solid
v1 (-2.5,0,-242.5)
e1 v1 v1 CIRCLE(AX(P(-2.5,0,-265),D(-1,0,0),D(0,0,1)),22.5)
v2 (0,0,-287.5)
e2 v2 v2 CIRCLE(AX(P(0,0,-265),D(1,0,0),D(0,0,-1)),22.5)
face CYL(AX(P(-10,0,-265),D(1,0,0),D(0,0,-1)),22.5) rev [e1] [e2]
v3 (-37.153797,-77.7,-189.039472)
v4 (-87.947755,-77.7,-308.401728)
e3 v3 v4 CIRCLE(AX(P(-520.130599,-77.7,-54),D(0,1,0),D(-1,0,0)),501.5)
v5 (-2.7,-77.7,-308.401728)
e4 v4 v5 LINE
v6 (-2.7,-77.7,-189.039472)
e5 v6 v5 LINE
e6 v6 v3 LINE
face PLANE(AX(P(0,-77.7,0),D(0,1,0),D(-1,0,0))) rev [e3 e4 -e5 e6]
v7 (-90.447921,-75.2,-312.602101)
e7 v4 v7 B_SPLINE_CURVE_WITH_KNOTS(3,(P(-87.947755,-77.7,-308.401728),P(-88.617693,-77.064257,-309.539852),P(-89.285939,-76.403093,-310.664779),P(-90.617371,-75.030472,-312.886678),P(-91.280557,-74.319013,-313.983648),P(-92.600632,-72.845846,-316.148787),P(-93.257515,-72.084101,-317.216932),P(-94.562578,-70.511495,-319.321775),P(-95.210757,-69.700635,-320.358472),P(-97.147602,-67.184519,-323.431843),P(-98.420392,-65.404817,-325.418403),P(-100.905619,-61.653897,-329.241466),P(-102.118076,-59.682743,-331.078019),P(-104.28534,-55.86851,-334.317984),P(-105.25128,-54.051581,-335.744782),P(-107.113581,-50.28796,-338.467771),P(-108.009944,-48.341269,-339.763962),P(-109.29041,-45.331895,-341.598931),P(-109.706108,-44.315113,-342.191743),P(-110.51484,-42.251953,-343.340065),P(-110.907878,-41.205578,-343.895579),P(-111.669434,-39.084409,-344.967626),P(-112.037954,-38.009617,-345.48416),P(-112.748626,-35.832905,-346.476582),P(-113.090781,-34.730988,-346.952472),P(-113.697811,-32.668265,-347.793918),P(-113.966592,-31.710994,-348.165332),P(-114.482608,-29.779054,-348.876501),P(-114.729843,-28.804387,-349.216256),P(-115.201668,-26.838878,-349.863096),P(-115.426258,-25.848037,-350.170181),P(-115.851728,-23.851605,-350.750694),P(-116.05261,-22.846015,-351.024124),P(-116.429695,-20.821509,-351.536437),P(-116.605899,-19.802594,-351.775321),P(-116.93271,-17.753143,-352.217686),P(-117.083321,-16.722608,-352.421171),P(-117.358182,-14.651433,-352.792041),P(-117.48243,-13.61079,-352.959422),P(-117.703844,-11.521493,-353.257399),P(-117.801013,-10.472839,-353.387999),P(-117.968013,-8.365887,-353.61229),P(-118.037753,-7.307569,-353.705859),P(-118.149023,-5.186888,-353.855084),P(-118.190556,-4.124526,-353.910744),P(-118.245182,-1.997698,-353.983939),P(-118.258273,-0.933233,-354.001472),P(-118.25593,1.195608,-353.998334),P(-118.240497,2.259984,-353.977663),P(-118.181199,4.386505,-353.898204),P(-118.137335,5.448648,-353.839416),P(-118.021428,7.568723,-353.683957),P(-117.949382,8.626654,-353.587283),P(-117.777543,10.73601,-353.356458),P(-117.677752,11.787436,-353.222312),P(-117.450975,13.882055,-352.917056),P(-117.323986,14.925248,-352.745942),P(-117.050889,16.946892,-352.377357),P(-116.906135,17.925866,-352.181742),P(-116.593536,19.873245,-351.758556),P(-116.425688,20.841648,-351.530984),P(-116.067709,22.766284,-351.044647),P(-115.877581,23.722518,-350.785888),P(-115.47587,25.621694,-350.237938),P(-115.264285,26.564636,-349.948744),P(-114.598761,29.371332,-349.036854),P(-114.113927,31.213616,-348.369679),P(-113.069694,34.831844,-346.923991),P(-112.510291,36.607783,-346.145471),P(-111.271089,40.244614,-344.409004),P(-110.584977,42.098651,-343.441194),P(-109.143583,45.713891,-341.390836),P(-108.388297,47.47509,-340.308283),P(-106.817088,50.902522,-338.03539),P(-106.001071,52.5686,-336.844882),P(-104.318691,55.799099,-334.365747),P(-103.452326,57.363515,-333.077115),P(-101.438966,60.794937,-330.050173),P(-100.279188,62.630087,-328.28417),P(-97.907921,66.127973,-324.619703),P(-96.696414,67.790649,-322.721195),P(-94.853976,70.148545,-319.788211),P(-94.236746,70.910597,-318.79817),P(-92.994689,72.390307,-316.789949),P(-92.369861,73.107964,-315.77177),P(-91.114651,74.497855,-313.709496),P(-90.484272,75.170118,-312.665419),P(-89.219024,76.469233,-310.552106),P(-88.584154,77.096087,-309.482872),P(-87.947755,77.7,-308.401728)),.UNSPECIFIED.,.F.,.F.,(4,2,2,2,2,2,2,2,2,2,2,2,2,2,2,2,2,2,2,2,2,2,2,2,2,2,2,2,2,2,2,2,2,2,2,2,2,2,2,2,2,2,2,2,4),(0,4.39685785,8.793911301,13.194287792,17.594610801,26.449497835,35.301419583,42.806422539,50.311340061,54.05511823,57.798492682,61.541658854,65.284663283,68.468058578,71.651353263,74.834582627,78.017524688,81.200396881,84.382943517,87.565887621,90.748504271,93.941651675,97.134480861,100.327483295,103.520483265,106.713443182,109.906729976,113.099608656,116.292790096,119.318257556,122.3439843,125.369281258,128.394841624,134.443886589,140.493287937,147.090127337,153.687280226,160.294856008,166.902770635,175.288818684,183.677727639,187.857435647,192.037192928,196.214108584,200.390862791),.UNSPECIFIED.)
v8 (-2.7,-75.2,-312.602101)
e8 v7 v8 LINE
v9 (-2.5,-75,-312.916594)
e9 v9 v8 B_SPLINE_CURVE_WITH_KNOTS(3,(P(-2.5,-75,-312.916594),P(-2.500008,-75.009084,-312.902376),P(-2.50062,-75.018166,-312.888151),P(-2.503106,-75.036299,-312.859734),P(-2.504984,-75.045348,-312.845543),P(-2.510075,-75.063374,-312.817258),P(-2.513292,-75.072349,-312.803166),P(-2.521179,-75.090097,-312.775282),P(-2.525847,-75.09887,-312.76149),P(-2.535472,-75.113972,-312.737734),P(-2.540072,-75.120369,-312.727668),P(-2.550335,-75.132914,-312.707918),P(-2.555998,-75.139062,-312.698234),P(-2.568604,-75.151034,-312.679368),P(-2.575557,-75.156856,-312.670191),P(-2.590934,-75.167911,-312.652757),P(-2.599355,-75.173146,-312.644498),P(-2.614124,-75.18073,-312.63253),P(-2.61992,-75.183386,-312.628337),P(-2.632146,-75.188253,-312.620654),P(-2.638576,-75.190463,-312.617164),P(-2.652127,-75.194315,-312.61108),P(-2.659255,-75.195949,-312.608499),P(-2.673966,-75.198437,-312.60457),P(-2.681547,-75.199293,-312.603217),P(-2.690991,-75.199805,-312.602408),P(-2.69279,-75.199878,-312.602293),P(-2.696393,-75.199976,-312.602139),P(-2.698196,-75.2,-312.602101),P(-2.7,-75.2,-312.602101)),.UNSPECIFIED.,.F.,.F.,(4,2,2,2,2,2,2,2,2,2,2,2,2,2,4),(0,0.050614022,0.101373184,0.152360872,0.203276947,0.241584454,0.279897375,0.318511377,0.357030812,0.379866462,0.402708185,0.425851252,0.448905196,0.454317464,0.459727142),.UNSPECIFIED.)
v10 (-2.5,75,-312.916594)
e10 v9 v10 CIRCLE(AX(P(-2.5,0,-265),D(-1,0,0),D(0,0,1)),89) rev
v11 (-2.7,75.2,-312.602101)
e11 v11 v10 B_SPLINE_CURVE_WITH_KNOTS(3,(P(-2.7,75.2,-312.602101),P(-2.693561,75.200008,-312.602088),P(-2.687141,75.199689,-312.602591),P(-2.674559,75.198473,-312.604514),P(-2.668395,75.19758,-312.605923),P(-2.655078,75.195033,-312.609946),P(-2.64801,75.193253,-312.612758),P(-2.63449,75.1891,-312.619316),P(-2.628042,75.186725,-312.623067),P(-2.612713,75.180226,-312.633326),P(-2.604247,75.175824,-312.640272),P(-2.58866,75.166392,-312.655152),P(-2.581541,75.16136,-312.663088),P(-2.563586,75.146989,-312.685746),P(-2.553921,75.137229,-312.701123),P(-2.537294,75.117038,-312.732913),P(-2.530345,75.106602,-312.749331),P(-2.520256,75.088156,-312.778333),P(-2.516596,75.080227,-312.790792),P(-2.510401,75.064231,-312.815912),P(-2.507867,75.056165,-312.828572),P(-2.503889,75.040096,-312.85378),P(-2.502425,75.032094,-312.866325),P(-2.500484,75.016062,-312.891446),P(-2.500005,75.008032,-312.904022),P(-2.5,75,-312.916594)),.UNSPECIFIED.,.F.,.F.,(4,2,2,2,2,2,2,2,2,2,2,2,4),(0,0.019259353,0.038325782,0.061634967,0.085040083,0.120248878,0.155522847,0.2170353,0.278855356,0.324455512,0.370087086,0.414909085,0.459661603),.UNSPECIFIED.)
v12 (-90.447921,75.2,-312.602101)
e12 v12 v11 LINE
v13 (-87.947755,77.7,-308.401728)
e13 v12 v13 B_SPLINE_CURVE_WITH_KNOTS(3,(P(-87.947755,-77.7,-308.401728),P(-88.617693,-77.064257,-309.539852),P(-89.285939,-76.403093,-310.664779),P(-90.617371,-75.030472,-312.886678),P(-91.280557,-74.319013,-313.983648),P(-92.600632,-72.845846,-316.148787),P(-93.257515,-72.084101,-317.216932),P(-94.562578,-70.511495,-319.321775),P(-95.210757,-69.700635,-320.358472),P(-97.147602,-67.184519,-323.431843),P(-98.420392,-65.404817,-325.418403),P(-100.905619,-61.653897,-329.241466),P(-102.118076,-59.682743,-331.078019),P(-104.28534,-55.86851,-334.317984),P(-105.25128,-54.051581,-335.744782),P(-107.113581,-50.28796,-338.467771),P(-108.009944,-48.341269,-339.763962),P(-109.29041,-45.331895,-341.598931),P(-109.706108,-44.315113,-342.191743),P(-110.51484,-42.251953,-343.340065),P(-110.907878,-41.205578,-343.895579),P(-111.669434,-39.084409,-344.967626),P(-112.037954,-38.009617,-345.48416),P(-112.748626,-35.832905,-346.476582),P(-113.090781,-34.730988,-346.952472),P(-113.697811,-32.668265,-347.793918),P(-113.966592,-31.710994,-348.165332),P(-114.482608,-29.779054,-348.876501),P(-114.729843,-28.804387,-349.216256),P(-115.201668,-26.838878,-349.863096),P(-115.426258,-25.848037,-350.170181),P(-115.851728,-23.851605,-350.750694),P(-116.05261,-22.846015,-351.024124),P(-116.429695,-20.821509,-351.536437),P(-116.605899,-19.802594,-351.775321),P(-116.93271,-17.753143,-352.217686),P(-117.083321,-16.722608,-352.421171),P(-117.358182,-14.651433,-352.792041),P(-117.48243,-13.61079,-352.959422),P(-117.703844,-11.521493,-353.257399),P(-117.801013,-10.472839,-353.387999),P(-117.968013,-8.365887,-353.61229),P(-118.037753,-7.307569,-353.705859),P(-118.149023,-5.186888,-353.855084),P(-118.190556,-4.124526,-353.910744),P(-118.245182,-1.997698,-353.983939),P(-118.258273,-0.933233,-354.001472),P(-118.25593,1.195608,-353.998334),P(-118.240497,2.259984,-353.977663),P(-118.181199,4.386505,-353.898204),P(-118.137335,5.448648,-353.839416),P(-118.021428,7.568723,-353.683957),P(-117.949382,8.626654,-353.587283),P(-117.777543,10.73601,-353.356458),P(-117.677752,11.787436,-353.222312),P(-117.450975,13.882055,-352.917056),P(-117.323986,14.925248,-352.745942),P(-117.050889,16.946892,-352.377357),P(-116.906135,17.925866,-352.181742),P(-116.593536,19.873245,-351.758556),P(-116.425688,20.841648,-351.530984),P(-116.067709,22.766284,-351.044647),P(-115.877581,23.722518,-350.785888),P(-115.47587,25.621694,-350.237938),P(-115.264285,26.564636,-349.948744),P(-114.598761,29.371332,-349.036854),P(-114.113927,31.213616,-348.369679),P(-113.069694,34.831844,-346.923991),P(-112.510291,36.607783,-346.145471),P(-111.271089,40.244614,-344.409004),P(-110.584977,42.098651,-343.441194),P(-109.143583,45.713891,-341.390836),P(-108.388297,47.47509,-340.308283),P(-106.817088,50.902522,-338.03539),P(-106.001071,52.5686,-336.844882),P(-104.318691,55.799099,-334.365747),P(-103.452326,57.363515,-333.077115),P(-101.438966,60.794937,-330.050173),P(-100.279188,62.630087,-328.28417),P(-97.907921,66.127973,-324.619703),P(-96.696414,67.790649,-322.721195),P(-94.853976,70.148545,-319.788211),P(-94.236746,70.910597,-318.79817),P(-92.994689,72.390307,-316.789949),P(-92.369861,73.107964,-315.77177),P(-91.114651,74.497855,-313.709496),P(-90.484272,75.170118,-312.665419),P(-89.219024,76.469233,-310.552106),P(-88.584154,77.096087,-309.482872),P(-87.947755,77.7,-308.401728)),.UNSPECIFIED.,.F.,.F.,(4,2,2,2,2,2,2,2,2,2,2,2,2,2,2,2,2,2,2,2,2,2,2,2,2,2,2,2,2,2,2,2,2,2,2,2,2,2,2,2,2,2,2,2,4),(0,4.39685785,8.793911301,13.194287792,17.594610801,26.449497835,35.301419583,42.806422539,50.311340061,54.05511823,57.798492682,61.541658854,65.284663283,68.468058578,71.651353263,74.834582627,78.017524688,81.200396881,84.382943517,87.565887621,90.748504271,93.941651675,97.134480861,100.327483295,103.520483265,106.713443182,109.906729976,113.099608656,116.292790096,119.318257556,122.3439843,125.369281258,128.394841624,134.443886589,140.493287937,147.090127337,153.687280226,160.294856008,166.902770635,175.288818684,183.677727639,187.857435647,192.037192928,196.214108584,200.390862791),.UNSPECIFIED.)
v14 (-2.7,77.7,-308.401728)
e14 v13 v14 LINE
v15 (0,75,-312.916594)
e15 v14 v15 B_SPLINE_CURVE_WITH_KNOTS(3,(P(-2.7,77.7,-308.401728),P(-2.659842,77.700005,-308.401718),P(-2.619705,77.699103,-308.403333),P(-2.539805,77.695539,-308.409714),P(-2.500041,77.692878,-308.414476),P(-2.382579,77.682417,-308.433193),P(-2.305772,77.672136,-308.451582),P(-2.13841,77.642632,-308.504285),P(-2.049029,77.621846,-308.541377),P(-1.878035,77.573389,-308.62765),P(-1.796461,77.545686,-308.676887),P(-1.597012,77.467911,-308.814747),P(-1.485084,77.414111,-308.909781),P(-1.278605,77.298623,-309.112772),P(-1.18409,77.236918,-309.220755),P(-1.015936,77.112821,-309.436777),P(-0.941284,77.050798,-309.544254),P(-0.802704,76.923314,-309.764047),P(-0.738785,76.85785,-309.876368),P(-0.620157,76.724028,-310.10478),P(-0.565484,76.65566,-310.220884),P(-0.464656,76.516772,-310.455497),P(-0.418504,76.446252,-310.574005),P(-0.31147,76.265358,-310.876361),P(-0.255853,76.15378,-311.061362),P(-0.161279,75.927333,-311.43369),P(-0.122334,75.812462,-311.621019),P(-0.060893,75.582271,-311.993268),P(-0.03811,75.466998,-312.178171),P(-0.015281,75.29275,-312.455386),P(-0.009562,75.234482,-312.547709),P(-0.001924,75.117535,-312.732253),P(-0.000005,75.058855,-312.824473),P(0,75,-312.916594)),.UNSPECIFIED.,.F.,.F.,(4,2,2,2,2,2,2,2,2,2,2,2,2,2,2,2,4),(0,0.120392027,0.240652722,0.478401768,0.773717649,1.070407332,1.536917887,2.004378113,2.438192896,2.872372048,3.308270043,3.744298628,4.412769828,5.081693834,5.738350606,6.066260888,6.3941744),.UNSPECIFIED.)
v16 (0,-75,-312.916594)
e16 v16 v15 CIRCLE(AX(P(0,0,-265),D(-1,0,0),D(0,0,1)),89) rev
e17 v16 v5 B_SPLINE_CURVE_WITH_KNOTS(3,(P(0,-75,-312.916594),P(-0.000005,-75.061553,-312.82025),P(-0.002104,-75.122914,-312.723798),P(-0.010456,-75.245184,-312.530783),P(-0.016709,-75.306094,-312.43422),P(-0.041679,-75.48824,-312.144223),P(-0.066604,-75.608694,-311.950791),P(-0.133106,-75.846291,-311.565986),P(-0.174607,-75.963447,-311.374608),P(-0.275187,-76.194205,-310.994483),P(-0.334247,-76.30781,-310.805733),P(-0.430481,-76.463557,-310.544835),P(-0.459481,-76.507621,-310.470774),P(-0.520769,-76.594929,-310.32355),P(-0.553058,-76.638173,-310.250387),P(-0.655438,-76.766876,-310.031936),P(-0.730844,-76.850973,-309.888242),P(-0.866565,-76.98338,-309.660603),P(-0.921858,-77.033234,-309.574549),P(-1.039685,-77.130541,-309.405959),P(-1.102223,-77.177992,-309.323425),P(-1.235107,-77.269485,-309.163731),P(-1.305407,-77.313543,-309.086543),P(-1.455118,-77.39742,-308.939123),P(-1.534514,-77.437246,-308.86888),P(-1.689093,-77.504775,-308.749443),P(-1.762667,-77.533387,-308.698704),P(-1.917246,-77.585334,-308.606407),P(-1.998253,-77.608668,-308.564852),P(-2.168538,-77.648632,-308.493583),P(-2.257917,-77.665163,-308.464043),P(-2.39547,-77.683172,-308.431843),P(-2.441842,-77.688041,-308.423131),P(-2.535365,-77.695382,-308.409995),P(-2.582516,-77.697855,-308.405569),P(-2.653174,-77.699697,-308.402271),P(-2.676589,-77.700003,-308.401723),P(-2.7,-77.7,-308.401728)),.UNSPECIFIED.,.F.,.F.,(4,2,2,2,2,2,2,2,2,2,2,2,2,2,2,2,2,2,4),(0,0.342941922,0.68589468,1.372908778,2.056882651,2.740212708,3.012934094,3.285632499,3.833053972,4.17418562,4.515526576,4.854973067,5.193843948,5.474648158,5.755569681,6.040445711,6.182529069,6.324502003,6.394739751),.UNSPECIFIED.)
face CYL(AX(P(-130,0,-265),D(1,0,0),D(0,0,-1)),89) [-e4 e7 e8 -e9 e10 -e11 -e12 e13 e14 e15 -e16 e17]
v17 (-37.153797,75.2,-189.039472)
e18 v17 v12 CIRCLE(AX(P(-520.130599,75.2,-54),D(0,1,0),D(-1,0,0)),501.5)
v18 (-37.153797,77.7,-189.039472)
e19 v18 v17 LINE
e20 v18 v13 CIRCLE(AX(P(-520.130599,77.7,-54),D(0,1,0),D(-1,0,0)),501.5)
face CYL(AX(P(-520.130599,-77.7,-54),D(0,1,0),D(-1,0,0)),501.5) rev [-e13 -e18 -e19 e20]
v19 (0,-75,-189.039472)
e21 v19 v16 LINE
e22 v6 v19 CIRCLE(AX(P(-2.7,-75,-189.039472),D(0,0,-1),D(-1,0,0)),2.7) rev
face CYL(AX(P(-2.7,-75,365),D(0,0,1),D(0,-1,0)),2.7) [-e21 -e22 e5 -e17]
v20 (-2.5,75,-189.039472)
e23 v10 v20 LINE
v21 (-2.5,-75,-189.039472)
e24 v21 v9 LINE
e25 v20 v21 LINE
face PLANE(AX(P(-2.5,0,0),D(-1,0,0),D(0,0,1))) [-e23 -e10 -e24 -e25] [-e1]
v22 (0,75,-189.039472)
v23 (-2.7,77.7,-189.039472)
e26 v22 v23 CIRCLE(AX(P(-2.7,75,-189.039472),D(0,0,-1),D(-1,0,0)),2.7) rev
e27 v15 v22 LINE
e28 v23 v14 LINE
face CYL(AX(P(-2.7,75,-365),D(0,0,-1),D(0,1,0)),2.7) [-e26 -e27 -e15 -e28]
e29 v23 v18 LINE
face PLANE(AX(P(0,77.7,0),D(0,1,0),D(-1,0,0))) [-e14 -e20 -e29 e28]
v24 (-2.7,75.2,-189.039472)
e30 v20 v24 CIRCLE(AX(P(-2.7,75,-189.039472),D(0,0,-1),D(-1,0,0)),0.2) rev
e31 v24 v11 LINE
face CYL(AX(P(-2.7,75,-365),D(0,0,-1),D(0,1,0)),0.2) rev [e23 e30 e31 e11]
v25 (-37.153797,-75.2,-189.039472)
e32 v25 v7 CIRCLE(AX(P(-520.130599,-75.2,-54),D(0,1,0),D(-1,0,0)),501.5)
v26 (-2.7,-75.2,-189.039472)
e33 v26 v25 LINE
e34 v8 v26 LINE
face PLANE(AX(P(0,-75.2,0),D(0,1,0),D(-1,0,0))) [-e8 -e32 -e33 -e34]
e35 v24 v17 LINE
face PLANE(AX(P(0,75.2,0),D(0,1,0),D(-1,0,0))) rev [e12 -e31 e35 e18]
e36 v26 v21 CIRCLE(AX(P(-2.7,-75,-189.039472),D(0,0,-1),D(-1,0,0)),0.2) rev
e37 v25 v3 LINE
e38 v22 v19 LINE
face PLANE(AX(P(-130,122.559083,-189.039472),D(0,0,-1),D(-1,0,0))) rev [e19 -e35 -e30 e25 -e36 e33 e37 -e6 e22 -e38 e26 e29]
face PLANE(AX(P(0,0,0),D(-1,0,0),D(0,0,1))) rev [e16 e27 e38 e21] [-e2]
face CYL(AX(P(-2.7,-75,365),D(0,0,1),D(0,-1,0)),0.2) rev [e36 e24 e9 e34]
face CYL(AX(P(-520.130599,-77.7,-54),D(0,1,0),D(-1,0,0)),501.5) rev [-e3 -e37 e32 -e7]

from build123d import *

# Parameters (mm, degrees)
SKETCH1_W               = 730
SKETCH1_H               = 150
BASE_FLANGE1_DEPTH      = 2.5
EDGE_FLANGE1_DEPTH      = 730
EDGE_FLANGE1_BEND_DEPTH = 730
SKETCH13_R              = 22.5
CUT_EXTRUDE2_DEPTH      = 10
CUT_EXTRUDE3_DEPTH      = 396.173746598
CUT_EXTRUDE3_DEPTH_BACK = 396.173746598
SKETCH14_W              = 631.337566112
SKETCH14_H              = 273.157514278
CUT_EXTRUDE4_DEPTH      = 396.173746598
CUT_EXTRUDE4_DEPTH_BACK = 396.173746598
CUT_EXTRUDE5_DEPTH      = 408.87885472


# Sheet-metal steps are written as plain solids
with BuildPart() as part:
    # Sketch1 → Base-Flange1 (new body)
    with BuildSketch(Plane(origin=(0, 0, 0), x_dir=(0, 0, -1), z_dir=(1, 0, 0))):
        Rectangle(SKETCH1_W, SKETCH1_H)
    extrude(amount=-BASE_FLANGE1_DEPTH)

    # Edge-Flange1 section (across the edge) → Edge-Flange1 (add)
    with BuildSketch(Plane(origin=(-2.5, 75.2, 365), x_dir=(0, -1, 0), z_dir=(0, 0, -1))):
        with BuildLine():
            Line((-2.5, 0.2), (-2.5, 127.5))
            Line((-2.5, 127.5), (0, 127.5))
            Line((0, 127.5), (0, 0.2))
            ThreePointArc((0, 0.2), (0.058578644, 0.058578644), (0.2, 0))
            Line((0.2, 0), (0.2, -2.5))
            ThreePointArc((0.2, -2.5), (-1.709188309, -1.709188309), (-2.5, 0.2))
        make_face()
    extrude(amount=EDGE_FLANGE1_DEPTH)

    # Edge-Flange1 section 2 (across the edge) → Edge-Flange1 bend (add)
    with BuildSketch(Plane(origin=(-2.5, -75.2, -365), x_dir=(0, 1, 0), z_dir=(0, 0, 1))):
        with BuildLine():
            Line((-2.5, 0.2), (-2.5, 127.5))
            Line((-2.5, 127.5), (0, 127.5))
            Line((0, 127.5), (0, 0.2))
            ThreePointArc((0, 0.2), (0.058578644, 0.058578644), (0.2, 0))
            Line((0.2, 0), (0.2, -2.5))
            ThreePointArc((0.2, -2.5), (-1.709188309, -1.709188309), (-2.5, 0.2))
        make_face()
    extrude(amount=EDGE_FLANGE1_BEND_DEPTH)

    # Sketch13 → Cut-Extrude2 (cut)
    with BuildSketch(Plane(origin=(0, 0, 0), x_dir=(0, 0, -1), z_dir=(1, 0, 0))):
        with Locations((265, 0)):
            Circle(SKETCH13_R)
        with Locations((-290, 0)):
            Circle(SKETCH13_R)
    extrude(amount=-CUT_EXTRUDE2_DEPTH, mode=Mode.SUBTRACT)

    # Sketch14 → Cut-Extrude3 (cut, two sides: drawn at the far end of the back side and taken through both)
    with BuildSketch(Plane(origin=(0, 0, 0), x_dir=(0, 0, -1), z_dir=(1, 0, 0)).offset(-CUT_EXTRUDE3_DEPTH_BACK)):
        with Locations((-126.629311255, -14.019673746)):
            Rectangle(SKETCH14_W, SKETCH14_H)
    extrude(amount=CUT_EXTRUDE3_DEPTH + CUT_EXTRUDE3_DEPTH_BACK, mode=Mode.SUBTRACT)

    # Sketch15 → Cut-Extrude4 (cut, two sides: drawn at the far end of the back side and taken through both)
    with BuildSketch(Plane(origin=(0, 0, 0), x_dir=(0, 0, -1), z_dir=(1, 0, 0)).offset(-CUT_EXTRUDE4_DEPTH_BACK)):
        with BuildLine():
            Line((302.266550641, 80.822052704), (310.532003477, 105.351783703))
            Line((310.532003477, 105.351783703), (400.668447303, 94.566226322))
            Line((400.668447303, 94.566226322), (380.252927975, -108.048173048))
            Line((380.252927975, -108.048173048), (291.286888445, -85.029403714))
            ThreePointArc((291.286888445, -85.029403714), (353.805609642, -5.879089735), (302.266550641, 80.822052704))
        make_face()
    extrude(amount=CUT_EXTRUDE4_DEPTH + CUT_EXTRUDE4_DEPTH_BACK, mode=Mode.SUBTRACT)

    # Sketch17 → Cut-Extrude5 (cut, through all)
    with BuildSketch(Plane(origin=(0, 77.7, 0), x_dir=(1, 0, 0), z_dir=(0, 1, 0))):
        with BuildLine():
            Line((-118.819244886, 354.751470834), (-213.837944087, 354.751470834))
            Line((-213.837944087, 354.751470834), (-213.837944087, 158.380448287))
            Line((-213.837944087, 158.380448287), (-29.613553222, 158.380448287))
            ThreePointArc((-29.613553222, 158.380448287), (-63.53464157, 261.418373894), (-118.819244886, 354.751470834))
        make_face()
    extrude(amount=-CUT_EXTRUDE5_DEPTH, mode=Mode.SUBTRACT)


solid = part.part
